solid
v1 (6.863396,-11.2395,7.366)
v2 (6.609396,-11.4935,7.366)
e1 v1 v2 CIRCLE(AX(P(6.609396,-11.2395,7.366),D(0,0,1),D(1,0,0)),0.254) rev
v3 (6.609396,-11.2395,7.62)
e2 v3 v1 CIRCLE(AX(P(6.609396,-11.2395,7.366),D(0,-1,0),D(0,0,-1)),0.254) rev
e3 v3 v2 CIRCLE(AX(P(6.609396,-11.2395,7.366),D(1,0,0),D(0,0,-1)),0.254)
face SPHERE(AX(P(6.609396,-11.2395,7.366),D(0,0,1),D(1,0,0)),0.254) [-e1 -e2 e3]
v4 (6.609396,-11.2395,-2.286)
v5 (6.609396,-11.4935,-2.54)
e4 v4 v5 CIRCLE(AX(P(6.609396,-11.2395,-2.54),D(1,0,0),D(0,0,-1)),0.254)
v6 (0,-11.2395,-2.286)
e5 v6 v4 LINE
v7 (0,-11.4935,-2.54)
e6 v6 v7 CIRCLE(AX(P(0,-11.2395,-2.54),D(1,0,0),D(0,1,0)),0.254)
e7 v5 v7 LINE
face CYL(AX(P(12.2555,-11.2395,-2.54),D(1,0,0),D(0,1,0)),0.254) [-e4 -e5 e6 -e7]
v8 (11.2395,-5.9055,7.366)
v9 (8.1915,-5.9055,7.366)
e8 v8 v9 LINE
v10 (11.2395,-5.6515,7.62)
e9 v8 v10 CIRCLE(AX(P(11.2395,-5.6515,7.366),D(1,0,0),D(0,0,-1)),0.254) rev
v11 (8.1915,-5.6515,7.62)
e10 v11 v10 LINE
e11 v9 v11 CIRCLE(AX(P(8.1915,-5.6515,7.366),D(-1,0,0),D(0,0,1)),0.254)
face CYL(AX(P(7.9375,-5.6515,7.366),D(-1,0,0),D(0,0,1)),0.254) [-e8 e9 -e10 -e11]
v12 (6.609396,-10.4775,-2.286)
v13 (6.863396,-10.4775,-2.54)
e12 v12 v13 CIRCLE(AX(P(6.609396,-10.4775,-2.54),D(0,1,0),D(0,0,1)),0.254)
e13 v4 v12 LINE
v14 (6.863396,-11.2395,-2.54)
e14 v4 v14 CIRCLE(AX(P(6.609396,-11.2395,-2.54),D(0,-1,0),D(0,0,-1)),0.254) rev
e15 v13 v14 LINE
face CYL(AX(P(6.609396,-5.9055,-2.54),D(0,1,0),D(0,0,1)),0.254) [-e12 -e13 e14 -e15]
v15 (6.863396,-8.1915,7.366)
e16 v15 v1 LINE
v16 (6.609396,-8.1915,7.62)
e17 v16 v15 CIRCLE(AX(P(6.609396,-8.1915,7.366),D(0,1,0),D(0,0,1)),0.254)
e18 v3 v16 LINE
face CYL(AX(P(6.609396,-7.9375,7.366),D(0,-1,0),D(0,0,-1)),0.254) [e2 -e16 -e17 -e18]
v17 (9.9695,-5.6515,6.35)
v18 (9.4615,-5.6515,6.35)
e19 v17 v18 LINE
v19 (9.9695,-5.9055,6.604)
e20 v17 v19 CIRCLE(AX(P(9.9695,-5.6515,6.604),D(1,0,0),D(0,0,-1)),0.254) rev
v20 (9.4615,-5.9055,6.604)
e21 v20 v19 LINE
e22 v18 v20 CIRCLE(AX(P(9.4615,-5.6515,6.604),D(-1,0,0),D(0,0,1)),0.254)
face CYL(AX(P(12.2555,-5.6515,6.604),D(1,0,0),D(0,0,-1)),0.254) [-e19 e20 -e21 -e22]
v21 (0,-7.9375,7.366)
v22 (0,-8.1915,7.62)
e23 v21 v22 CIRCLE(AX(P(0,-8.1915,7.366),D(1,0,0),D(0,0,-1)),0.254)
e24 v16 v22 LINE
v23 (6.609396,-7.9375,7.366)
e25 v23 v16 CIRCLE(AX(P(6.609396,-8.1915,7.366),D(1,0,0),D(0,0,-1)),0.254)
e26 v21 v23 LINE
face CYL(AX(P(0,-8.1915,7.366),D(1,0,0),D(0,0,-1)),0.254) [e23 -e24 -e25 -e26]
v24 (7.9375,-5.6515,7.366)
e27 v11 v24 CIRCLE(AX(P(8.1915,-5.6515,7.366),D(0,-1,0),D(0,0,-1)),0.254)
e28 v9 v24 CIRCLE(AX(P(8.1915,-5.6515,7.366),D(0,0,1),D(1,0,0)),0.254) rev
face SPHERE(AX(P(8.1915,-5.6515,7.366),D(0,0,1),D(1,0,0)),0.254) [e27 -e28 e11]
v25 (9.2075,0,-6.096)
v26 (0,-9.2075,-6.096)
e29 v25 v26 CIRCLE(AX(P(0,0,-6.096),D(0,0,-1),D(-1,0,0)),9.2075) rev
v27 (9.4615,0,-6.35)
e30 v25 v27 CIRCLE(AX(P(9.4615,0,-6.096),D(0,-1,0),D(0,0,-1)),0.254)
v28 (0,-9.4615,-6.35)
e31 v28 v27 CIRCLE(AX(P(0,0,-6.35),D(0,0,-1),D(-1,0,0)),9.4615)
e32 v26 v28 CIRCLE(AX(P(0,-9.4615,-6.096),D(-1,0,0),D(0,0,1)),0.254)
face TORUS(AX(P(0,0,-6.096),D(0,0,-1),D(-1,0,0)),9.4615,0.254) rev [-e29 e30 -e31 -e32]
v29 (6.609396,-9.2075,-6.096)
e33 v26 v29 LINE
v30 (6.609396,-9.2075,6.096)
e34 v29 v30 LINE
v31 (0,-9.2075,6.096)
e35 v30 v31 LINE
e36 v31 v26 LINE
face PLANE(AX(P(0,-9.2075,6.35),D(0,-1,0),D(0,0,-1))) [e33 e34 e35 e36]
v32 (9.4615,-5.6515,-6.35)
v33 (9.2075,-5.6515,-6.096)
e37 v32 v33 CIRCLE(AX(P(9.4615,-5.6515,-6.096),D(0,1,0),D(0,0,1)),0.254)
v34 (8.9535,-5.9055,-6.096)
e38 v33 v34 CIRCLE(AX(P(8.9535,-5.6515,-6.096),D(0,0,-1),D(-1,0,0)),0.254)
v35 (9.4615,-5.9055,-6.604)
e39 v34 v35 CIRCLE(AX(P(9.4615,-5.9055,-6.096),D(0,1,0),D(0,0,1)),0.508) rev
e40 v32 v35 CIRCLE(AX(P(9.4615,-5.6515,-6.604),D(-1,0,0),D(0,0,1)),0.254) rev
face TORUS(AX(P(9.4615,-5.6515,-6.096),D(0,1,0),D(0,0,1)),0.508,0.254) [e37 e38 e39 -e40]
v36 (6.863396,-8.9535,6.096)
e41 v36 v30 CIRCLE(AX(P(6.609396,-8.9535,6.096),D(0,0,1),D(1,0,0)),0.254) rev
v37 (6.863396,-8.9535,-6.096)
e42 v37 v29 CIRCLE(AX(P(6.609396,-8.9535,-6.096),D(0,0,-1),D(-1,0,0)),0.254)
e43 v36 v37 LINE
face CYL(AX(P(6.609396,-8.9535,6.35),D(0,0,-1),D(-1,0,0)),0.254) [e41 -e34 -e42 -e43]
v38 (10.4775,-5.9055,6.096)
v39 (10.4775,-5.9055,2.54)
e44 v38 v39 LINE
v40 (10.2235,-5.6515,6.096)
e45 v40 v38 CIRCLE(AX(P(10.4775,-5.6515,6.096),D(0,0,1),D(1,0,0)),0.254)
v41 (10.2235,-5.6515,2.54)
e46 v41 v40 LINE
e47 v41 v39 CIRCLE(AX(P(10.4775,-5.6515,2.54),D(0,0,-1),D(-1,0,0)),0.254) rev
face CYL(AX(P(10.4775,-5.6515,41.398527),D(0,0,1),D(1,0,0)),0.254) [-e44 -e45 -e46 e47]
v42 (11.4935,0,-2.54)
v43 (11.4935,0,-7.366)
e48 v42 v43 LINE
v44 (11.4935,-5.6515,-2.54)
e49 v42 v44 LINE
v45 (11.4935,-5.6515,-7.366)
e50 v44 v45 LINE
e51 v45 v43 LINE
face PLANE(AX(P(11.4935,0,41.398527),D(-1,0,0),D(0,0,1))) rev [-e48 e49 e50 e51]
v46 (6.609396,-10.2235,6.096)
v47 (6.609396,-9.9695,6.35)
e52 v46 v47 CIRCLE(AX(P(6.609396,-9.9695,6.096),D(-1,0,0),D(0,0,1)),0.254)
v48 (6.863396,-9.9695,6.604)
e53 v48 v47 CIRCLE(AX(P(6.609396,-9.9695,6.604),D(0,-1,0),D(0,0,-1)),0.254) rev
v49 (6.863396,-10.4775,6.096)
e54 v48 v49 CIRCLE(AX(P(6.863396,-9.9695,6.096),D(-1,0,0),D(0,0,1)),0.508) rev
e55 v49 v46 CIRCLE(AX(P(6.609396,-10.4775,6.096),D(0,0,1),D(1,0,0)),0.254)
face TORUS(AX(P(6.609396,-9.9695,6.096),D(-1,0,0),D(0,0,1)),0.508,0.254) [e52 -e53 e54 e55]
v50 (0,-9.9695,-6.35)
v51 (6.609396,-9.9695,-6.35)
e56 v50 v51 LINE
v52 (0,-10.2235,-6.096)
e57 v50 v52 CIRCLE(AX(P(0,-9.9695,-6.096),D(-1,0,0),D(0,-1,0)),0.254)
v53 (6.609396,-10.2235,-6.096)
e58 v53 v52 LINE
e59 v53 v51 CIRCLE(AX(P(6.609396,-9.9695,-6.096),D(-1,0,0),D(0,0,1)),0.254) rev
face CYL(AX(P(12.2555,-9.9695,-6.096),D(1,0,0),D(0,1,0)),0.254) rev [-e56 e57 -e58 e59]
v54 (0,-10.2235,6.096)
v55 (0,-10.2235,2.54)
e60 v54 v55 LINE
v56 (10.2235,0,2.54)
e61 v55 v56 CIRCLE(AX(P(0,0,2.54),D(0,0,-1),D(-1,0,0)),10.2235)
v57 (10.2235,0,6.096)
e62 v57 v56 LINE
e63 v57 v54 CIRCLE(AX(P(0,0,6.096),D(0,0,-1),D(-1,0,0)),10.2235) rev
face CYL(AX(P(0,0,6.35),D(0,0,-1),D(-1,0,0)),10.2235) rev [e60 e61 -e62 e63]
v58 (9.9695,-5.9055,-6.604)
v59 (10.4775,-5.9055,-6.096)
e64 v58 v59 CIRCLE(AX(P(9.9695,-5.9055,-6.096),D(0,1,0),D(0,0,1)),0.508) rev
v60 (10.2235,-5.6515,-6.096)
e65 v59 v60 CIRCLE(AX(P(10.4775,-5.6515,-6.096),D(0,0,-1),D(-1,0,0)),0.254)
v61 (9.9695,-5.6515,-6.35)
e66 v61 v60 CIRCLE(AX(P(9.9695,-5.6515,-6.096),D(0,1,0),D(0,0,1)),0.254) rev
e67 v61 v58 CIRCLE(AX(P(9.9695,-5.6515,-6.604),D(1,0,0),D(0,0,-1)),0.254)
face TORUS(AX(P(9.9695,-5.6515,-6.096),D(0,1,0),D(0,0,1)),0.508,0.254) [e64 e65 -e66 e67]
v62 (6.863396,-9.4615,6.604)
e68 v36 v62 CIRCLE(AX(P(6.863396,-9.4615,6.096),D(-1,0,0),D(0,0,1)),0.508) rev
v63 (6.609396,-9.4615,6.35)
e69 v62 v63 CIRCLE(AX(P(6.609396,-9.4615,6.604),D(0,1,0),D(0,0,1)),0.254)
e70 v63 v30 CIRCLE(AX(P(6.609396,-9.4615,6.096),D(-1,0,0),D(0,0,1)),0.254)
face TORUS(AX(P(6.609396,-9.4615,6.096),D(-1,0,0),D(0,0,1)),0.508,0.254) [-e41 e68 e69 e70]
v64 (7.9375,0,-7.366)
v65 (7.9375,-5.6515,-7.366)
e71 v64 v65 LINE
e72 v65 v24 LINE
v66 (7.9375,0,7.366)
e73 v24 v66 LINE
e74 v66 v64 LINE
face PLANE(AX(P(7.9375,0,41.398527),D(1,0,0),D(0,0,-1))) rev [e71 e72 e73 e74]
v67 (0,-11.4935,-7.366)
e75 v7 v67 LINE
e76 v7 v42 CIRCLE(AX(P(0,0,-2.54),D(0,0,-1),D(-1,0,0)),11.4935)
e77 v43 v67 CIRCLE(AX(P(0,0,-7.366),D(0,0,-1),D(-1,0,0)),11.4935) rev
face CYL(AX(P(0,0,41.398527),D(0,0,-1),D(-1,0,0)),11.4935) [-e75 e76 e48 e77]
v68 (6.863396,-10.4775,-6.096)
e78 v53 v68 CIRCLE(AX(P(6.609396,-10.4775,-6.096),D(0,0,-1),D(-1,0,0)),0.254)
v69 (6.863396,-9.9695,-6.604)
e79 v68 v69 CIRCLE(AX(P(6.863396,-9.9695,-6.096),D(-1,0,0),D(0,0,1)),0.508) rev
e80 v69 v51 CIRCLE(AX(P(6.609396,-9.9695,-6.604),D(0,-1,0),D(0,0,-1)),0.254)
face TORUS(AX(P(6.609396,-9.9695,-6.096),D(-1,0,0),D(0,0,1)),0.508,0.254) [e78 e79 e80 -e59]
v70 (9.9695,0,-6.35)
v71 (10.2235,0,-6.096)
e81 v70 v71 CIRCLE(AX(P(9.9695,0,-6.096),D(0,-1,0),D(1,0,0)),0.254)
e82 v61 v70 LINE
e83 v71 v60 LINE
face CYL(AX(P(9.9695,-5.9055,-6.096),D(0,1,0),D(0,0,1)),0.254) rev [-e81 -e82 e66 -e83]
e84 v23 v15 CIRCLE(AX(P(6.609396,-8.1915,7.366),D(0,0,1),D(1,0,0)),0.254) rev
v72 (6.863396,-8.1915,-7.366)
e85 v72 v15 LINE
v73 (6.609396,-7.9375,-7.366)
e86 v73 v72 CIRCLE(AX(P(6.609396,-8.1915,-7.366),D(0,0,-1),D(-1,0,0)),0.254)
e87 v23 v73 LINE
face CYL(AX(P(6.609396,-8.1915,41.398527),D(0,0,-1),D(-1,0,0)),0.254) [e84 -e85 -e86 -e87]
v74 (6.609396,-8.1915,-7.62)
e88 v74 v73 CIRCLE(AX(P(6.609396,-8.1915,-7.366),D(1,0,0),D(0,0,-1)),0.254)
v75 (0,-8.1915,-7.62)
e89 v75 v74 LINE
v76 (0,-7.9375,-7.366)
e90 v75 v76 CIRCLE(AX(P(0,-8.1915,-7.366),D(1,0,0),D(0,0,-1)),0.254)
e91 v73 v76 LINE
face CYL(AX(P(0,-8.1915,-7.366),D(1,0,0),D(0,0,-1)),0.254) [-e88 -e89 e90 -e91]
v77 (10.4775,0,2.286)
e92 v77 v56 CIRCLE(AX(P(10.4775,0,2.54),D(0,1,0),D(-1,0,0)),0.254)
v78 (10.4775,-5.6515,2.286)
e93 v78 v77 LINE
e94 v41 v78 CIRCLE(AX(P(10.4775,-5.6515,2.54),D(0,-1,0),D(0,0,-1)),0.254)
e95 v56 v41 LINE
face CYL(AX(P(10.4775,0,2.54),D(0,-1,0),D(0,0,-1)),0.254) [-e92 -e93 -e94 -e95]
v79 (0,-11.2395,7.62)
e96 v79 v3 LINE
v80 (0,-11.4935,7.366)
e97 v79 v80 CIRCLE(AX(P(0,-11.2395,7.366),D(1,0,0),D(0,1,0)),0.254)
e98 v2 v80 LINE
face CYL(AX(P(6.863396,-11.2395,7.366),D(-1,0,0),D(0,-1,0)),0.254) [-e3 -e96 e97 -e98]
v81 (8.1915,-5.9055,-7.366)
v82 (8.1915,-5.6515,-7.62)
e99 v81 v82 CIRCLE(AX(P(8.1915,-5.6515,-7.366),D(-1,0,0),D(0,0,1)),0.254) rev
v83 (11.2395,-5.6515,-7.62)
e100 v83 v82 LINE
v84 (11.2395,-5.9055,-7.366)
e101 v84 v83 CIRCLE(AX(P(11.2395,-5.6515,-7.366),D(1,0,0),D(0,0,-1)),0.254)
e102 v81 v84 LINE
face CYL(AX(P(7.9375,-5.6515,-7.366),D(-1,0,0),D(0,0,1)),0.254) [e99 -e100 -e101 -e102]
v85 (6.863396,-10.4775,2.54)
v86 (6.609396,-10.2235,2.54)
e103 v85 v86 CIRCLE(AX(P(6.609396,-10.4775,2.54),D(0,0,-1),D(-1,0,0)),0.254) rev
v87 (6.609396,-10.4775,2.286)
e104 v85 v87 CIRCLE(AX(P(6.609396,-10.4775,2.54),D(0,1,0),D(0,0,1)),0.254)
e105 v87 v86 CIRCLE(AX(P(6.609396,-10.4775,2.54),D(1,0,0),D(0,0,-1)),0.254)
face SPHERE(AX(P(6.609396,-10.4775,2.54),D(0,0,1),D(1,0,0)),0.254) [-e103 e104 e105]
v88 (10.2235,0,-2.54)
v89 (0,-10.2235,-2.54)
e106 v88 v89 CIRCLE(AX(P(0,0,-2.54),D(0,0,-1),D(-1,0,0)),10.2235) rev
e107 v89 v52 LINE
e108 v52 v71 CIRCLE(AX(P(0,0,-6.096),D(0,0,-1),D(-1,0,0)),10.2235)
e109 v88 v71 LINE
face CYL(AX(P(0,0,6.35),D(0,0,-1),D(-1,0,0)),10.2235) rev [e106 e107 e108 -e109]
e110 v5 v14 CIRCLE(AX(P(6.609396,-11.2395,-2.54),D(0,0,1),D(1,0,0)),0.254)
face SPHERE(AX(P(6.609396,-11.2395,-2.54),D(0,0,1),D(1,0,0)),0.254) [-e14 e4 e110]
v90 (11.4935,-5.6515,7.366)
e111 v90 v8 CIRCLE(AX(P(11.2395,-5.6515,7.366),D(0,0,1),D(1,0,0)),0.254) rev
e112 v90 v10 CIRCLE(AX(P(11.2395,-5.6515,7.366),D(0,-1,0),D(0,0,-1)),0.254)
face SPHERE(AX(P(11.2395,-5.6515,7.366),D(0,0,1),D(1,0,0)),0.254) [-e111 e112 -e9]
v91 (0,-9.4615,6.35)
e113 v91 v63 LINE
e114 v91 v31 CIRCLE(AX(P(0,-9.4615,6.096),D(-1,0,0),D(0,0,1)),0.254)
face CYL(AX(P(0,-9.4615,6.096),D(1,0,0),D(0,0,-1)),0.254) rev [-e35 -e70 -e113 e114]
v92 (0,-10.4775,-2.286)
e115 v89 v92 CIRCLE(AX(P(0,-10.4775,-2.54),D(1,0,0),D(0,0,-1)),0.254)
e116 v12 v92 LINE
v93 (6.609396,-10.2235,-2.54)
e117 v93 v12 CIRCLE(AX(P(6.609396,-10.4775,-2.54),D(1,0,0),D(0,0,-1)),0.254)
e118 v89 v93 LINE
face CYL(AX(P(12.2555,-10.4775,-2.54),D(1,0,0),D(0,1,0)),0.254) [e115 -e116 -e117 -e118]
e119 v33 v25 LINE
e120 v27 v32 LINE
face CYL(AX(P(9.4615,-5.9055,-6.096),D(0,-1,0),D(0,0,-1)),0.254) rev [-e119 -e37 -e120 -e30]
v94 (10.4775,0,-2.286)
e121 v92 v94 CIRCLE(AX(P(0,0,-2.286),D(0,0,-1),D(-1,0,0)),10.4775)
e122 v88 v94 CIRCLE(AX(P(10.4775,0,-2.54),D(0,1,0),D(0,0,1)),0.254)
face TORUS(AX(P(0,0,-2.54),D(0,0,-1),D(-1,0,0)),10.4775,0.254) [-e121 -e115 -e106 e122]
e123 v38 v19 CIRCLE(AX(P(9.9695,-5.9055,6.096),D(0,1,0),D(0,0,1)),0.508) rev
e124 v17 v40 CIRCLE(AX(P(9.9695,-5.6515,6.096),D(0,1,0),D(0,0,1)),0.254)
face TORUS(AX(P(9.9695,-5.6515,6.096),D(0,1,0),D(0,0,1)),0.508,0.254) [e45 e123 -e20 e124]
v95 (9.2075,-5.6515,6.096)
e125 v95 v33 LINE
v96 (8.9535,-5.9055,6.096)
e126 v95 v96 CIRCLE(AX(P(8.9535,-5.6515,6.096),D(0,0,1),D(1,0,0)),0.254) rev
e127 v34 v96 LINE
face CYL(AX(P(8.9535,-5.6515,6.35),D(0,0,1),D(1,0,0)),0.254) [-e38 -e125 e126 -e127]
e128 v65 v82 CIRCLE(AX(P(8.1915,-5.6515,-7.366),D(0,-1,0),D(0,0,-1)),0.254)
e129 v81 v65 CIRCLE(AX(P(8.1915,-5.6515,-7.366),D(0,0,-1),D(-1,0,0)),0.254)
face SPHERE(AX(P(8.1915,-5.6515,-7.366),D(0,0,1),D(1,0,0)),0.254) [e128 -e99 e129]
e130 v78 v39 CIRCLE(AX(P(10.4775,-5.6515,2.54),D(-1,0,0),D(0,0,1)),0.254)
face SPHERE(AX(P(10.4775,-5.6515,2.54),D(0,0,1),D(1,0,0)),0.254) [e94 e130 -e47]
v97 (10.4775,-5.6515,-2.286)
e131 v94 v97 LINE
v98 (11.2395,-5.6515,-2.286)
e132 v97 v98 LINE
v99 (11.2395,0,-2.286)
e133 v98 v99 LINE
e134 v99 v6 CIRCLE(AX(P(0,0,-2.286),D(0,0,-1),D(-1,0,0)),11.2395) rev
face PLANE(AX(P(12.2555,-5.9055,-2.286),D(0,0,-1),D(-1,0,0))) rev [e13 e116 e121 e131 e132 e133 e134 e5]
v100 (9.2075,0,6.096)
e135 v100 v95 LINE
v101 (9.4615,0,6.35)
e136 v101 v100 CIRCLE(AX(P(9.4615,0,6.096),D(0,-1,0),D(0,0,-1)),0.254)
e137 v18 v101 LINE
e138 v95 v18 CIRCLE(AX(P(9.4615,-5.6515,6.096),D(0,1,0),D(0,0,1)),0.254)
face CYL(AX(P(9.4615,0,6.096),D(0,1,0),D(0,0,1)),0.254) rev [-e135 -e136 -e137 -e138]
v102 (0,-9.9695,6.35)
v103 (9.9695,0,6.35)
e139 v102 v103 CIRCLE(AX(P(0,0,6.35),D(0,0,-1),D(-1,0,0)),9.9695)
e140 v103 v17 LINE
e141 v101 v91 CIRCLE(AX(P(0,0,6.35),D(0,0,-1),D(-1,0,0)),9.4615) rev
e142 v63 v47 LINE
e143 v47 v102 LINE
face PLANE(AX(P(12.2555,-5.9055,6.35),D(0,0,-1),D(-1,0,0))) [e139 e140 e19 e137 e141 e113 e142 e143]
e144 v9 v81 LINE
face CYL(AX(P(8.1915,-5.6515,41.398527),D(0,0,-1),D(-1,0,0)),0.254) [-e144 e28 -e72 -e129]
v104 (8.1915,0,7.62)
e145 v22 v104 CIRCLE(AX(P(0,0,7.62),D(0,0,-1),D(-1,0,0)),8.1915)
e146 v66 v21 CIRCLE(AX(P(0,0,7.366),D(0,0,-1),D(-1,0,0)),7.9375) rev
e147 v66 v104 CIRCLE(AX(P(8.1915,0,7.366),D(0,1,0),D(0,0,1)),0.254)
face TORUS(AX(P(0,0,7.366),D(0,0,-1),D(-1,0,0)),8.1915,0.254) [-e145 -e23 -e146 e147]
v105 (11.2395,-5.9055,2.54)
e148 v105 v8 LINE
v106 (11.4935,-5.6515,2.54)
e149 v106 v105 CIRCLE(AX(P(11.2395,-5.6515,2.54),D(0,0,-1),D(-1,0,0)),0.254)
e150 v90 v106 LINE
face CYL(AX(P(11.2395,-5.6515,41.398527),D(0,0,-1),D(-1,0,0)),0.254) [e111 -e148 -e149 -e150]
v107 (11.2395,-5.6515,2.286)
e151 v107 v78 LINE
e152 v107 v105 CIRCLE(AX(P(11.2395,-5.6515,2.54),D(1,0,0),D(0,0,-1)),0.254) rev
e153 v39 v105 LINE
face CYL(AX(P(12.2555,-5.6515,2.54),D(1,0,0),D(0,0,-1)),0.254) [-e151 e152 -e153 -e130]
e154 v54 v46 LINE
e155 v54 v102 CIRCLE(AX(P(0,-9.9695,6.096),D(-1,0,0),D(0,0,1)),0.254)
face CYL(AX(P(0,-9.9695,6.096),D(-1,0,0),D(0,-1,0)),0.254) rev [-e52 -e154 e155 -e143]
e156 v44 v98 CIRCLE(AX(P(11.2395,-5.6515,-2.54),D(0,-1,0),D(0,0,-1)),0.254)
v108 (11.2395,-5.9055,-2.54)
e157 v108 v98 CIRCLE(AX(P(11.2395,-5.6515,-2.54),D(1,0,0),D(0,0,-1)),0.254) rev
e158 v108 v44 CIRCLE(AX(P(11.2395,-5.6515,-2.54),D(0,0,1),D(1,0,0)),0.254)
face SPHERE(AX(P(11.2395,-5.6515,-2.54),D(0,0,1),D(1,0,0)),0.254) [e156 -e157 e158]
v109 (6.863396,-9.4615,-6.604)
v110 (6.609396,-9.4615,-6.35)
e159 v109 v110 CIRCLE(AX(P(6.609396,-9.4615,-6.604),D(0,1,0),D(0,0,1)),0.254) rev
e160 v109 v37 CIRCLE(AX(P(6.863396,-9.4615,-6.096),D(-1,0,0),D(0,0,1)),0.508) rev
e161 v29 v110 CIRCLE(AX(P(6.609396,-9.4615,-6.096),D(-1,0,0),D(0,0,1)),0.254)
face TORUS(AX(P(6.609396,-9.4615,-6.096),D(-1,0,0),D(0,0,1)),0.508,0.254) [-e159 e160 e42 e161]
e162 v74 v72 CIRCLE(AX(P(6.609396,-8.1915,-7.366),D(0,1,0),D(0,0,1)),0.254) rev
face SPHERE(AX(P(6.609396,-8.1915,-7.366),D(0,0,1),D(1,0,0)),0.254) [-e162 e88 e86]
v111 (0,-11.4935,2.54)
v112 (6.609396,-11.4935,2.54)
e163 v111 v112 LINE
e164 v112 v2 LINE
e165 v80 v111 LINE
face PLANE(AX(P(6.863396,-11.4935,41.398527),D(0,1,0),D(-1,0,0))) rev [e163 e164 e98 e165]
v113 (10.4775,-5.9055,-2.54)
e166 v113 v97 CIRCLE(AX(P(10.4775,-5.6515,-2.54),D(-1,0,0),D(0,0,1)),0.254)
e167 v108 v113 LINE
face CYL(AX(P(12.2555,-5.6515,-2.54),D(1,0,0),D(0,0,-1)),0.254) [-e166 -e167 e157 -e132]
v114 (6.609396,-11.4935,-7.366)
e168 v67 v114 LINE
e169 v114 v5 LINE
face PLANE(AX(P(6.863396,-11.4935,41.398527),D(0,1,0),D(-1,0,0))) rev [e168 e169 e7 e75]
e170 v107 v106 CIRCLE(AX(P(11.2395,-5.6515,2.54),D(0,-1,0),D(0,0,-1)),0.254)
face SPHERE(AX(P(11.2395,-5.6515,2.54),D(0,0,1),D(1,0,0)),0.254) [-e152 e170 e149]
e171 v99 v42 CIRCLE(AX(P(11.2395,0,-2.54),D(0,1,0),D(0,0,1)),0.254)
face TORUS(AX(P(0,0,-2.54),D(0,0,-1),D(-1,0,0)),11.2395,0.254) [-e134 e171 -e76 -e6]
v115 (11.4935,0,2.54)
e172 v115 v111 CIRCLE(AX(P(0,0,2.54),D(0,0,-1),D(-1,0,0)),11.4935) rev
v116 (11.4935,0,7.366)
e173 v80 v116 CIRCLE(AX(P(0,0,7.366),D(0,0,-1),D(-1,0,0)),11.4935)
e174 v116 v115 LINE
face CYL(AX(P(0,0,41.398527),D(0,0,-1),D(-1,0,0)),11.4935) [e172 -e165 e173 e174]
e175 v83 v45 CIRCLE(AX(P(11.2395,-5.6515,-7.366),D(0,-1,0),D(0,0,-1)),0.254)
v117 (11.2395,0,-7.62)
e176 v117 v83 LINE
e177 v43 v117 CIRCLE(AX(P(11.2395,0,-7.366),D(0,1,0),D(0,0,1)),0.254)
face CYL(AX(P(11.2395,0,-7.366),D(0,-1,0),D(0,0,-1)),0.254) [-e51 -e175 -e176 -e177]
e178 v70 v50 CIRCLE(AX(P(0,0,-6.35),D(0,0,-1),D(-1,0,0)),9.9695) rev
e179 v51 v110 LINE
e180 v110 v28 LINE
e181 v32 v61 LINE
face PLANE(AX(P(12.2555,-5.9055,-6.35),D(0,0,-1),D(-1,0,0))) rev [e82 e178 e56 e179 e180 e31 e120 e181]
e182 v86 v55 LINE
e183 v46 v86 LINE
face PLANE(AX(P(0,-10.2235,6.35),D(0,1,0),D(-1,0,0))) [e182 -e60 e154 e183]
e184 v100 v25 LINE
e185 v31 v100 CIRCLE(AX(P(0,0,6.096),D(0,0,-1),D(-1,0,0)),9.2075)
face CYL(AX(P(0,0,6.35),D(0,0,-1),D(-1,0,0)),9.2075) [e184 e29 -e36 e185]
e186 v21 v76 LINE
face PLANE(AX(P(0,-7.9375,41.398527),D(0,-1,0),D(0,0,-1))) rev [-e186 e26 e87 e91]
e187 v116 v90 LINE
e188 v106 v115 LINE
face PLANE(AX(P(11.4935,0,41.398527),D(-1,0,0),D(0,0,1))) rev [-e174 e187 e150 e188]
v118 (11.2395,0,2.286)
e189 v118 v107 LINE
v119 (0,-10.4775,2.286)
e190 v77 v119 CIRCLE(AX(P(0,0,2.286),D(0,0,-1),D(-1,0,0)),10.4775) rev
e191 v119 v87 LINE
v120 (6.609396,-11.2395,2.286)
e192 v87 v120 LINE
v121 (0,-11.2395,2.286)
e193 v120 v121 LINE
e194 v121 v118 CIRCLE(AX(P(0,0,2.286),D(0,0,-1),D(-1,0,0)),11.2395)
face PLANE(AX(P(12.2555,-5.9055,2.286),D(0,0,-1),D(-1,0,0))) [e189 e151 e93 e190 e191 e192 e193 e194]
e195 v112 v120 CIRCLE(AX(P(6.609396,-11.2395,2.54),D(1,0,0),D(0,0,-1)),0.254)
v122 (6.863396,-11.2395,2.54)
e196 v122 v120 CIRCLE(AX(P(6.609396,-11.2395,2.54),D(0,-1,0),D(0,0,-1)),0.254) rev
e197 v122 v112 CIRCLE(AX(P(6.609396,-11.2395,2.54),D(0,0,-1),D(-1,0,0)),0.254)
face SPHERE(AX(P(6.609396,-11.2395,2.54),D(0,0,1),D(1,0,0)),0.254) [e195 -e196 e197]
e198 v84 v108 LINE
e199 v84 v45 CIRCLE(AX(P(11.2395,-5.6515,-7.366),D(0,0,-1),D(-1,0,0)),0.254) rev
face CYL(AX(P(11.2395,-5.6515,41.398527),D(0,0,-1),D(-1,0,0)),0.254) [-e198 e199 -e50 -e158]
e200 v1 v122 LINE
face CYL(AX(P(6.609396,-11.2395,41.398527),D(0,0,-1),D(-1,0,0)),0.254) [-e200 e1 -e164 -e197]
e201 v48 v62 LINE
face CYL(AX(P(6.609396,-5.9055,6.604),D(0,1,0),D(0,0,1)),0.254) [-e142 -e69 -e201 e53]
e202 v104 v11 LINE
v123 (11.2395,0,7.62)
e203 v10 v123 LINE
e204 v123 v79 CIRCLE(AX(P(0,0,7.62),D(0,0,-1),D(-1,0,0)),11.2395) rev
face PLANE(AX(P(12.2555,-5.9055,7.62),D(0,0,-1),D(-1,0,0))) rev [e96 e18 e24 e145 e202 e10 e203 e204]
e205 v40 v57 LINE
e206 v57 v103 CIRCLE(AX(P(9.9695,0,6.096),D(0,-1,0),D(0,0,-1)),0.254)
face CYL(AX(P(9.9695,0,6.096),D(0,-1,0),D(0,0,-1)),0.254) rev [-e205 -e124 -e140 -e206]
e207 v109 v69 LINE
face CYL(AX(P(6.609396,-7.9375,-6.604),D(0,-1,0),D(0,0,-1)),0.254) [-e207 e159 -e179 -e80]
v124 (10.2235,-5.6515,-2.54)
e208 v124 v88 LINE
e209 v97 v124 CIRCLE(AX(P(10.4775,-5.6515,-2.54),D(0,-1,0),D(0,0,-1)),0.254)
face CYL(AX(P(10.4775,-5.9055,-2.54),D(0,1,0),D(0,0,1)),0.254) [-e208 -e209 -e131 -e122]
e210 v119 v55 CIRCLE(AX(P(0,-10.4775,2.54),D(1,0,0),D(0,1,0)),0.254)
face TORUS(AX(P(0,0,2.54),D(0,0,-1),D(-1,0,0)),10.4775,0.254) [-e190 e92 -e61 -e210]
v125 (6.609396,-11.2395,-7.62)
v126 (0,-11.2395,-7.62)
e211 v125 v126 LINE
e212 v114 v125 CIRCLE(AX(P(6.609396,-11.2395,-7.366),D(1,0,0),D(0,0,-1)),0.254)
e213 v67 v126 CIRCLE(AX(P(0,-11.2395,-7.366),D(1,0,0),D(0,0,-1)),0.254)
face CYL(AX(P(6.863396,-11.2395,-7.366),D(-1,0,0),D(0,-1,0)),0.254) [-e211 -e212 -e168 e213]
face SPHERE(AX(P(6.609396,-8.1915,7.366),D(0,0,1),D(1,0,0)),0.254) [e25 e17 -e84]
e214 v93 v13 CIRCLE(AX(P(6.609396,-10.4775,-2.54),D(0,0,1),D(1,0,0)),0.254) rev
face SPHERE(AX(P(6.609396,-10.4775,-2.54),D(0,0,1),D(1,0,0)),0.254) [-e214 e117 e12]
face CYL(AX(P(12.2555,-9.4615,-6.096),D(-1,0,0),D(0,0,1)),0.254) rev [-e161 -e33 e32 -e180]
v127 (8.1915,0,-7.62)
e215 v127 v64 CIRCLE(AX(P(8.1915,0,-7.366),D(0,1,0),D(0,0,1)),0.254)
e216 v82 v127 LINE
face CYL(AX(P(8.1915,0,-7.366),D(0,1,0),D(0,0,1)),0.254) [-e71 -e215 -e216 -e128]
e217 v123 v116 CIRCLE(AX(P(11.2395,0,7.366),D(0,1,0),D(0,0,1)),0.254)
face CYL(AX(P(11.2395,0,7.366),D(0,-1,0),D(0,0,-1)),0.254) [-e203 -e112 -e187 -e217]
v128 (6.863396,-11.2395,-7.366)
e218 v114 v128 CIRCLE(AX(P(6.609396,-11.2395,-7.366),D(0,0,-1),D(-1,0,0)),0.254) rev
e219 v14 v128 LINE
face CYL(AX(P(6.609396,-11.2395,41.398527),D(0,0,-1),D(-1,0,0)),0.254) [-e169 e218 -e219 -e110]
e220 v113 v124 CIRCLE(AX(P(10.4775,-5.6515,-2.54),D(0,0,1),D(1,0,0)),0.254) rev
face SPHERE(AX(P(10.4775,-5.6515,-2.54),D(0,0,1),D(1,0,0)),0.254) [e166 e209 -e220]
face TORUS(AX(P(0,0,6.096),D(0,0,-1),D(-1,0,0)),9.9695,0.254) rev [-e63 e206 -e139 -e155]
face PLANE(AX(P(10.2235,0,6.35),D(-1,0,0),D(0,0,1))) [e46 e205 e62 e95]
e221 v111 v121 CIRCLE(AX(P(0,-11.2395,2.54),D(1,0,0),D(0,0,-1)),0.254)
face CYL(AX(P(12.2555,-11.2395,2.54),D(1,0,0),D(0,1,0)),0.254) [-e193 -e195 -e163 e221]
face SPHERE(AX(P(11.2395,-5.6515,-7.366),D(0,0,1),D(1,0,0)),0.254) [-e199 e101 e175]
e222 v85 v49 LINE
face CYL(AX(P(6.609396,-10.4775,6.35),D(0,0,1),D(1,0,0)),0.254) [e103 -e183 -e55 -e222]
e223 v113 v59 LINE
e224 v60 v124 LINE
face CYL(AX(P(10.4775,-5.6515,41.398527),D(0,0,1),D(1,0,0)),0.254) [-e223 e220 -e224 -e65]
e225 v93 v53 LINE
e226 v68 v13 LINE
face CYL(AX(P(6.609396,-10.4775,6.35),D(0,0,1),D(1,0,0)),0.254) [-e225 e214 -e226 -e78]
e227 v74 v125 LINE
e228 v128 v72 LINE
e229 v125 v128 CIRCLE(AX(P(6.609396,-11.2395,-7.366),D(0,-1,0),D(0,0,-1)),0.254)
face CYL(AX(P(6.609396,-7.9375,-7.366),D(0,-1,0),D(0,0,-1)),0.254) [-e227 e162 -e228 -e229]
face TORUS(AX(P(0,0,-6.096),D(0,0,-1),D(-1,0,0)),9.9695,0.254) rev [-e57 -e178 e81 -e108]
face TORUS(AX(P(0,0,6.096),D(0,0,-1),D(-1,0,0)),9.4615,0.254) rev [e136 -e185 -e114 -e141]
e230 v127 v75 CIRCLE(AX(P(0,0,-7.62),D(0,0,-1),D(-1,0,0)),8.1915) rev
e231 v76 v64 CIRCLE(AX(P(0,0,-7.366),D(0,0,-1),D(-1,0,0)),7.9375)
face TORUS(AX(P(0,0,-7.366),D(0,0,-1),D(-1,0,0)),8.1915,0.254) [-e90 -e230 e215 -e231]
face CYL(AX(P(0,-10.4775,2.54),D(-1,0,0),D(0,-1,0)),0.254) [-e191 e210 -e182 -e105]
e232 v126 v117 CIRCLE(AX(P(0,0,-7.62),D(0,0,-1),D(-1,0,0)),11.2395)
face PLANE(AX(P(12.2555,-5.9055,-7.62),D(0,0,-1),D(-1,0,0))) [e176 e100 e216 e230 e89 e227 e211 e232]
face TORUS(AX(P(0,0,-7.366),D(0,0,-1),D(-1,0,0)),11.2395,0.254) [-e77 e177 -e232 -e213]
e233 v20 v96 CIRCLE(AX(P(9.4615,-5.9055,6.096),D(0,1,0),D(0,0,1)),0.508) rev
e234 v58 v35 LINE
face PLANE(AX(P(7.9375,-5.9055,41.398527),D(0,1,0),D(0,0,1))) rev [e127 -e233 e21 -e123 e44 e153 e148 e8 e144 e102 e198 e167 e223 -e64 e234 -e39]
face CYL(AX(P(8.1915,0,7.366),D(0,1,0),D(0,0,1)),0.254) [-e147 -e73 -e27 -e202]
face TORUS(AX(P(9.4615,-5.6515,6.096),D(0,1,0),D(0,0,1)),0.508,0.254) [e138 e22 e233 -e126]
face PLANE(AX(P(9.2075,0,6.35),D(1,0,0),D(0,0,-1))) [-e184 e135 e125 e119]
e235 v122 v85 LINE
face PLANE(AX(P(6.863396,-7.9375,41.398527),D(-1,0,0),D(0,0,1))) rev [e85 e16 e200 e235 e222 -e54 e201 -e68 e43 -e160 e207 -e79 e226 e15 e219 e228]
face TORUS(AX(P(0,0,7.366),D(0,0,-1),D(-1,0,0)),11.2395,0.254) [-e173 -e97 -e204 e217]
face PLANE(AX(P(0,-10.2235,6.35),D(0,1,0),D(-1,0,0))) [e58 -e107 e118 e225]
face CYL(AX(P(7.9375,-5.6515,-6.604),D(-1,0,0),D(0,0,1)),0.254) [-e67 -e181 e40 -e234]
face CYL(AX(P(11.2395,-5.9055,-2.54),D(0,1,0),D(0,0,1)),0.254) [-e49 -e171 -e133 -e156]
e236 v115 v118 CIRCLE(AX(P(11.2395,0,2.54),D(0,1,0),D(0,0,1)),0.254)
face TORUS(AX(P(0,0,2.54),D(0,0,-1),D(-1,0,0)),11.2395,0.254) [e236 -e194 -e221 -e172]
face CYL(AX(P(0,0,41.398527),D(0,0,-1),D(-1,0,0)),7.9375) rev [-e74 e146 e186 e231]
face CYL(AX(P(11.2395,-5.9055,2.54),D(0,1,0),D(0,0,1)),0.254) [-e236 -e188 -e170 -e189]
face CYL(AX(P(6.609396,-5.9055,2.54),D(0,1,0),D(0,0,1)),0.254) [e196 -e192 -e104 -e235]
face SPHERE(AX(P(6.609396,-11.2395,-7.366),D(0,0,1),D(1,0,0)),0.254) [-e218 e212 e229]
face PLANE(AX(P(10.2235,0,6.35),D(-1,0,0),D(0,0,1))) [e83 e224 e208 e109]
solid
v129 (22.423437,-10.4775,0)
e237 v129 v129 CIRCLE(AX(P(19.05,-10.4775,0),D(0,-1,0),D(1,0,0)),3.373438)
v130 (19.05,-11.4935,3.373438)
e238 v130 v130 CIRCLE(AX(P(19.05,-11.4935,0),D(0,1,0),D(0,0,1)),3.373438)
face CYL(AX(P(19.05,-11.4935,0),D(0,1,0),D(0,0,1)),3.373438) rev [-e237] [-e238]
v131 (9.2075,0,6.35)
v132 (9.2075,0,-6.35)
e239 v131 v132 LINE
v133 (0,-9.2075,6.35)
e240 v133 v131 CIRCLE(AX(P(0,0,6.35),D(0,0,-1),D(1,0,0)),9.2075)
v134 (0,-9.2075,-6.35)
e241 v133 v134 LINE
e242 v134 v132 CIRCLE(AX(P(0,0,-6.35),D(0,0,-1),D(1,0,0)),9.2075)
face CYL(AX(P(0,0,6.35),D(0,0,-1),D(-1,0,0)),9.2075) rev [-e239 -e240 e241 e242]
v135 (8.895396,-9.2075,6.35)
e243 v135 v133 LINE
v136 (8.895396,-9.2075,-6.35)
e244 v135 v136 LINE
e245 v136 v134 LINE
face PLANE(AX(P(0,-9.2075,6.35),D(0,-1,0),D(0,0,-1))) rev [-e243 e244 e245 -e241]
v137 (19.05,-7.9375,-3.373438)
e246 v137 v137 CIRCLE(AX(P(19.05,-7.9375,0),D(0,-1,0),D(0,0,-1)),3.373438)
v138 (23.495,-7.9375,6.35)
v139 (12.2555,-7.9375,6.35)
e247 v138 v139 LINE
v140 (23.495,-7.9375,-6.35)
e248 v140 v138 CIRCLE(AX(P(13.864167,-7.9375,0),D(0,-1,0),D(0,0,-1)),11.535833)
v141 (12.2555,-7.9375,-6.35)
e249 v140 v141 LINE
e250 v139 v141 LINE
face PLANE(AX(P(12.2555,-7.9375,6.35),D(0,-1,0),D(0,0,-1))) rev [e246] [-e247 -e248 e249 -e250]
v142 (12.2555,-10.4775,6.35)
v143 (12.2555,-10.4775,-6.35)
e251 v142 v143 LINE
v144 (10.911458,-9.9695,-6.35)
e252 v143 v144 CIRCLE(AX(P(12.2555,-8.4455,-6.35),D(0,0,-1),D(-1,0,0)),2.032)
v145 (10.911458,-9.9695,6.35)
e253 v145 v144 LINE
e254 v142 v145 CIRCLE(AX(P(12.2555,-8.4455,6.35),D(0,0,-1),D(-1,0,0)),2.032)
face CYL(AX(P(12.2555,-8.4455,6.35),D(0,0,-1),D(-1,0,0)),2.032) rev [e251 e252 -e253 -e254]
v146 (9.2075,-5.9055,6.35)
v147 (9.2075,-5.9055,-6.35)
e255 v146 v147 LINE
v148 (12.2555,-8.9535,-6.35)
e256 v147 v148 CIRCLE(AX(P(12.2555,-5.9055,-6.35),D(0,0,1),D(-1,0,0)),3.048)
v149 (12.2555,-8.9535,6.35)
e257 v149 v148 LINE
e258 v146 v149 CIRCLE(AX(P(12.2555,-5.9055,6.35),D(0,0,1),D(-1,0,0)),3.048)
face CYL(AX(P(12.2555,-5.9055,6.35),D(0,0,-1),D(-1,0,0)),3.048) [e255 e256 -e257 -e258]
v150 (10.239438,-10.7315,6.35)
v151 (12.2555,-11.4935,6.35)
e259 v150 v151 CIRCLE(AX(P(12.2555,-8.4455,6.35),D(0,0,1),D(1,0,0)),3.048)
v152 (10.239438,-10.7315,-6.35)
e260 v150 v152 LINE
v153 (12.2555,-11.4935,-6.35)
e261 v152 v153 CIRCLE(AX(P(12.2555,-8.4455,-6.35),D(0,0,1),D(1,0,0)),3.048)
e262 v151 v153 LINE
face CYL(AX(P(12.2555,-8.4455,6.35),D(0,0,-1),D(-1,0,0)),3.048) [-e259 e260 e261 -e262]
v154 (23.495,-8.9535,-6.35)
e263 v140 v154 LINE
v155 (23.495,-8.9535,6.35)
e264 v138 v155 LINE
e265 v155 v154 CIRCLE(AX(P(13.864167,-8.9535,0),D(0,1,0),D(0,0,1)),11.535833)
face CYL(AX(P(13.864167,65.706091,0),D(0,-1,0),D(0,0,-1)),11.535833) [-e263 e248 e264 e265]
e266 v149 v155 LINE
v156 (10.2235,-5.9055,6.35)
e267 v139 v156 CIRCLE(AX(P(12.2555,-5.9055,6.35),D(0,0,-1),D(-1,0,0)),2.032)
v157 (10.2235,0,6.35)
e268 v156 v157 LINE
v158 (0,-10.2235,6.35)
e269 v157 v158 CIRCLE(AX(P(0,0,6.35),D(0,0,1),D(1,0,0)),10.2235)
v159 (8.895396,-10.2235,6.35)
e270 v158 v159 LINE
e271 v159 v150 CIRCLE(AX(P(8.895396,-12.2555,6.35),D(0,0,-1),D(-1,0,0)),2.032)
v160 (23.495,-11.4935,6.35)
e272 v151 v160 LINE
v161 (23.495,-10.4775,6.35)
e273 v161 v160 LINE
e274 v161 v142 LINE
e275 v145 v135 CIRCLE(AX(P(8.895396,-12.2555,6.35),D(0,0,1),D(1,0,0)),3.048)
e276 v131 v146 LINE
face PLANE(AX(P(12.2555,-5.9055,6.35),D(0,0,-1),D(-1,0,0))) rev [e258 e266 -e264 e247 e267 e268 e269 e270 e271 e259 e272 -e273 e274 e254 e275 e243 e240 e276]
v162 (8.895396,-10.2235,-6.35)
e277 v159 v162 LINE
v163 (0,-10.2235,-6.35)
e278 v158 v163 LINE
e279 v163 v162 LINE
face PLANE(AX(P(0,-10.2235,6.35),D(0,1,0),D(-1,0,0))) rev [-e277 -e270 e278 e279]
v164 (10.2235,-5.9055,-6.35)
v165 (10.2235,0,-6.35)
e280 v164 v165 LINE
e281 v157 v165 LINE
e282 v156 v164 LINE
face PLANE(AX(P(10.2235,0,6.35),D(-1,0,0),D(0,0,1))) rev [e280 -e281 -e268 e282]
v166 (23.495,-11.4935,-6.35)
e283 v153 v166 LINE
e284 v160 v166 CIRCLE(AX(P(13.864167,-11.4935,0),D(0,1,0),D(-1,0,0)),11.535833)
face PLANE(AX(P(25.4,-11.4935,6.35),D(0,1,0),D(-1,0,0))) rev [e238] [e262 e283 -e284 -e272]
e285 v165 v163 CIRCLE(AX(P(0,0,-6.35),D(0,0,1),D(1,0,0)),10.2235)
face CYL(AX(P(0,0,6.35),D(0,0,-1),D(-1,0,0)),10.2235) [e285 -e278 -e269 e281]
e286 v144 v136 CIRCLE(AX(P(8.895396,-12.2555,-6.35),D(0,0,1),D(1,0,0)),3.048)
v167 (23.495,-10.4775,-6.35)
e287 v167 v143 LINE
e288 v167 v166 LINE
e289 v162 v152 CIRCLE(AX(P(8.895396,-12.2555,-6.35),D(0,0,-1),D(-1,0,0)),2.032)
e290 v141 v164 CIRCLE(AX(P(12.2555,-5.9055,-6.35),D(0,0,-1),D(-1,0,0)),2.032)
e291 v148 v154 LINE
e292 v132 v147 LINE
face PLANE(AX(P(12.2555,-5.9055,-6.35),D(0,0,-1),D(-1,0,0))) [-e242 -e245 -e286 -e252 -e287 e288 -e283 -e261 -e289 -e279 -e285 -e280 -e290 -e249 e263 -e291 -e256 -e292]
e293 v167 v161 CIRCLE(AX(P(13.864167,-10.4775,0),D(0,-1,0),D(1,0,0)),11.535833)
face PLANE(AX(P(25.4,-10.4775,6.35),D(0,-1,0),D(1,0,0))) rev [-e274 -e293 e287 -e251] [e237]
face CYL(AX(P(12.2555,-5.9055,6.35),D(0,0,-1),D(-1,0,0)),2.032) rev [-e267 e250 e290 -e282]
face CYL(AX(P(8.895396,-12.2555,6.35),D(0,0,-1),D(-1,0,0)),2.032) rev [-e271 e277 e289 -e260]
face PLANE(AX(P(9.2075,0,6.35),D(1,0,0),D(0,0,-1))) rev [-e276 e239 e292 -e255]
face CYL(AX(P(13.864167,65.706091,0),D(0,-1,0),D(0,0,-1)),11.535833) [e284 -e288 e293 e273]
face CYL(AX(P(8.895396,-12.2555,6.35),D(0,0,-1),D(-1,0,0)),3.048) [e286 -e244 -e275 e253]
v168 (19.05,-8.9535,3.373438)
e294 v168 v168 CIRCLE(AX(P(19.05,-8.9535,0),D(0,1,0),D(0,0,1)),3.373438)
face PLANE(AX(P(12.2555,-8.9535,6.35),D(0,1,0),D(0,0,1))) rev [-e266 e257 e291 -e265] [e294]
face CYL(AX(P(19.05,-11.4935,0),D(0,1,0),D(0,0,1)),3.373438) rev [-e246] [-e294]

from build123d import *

# Parameters (mm, degrees)
BOSS_EXTRUDE1_DEPTH         = 6.35
SKETCH2_R                   = 3.3734375
CUT_EXTRUDE1_DEPTH          = 29.59340907
CUT_EXTRUDE3_DEPTH          = 29.59340907
CUT_EXTRUDE3_DEPTH_BACK     = 29.59340907
BOSS_EXTRUDE2_DEPTH         = 7.62
BOSS_EXTRUDE2_DEPTH_BACK    = 7.62
BODY_MOVE_COPY1_START       = -5.9055
BODY_MOVE_COPY1_OUTLINE_W   = 1.016
BODY_MOVE_COPY1_OUTLINE_H   = 12.7
BODY_MOVE_COPY1_DEPTH       = 5.9055
BODY_MOVE_COPY1_START_2     = -10.2235
BODY_MOVE_COPY1_2_OUTLINE_W = 1.016
BODY_MOVE_COPY1_2_OUTLINE_H = 12.7
BODY_MOVE_COPY1_2_DEPTH     = 0.254
BODY_MOVE_COPY1_START_3     = -8.9535
BODY_MOVE_COPY1_3_OUTLINE_R = 3.3734375
BODY_MOVE_COPY1_3_DEPTH     = 3.048
BODY_MOVE_COPY1_START_4     = -11.4935
BODY_MOVE_COPY1_4_OUTLINE_R = 3.3734375
BODY_MOVE_COPY1_4_DEPTH     = 2.286
BODY_MOVE_COPY1_5_OUTLINE_W = 1.016
BODY_MOVE_COPY1_5_OUTLINE_H = 12.7
BODY_MOVE_COPY1_5_DEPTH     = 9.2075
BODY_MOVE_COPY1_START_5     = -10.7315
BODY_MOVE_COPY1_6_OUTLINE_W = 1.016
BODY_MOVE_COPY1_6_OUTLINE_H = 12.7
BODY_MOVE_COPY1_6_DEPTH     = 1.524
BODY_MOVE_COPY1_START_6     = -6.35
BODY_MOVE_COPY1_7_DEPTH     = 12.7
BODY_MOVE_COPY1_8_DEPTH     = 12.7
CUT_EXTRUDE4_DEPTH          = 2.286
CUT_EXTRUDE4_DEPTH_BACK     = 2.286
FILLET1_R                   = 0.254


with BuildPart() as part:
    # Sketch1 → Boss-Extrude1 (new, symmetric)
    with BuildSketch(Plane.XY):
        with BuildLine():
            Line((0, -9.2075), (8.895395835, -9.2075))
            ThreePointArc((8.895395835, -9.2075), (9.973026569, -9.404357071), (10.911458334, -9.9695))
            ThreePointArc((10.911458334, -9.9695), (11.53707951, -10.346261952), (12.2555, -10.4775))
            Line((12.2555, -10.4775), (25.4, -10.4775))
            Line((25.4, -10.4775), (25.4, -11.4935))
            Line((25.4, -11.4935), (12.2555, -11.4935))
            ThreePointArc((12.2555, -11.4935), (11.177869265, -11.296642929), (10.239437501, -10.7315))
            ThreePointArc((10.239437501, -10.7315), (9.613816325, -10.354738048), (8.895395835, -10.2235))
            Line((8.895395835, -10.2235), (0, -10.2235))
            ThreePointArc((0, -10.2235), (-7.229106177, 7.229106177), (10.2235, 0))
            Line((10.2235, 0), (10.2235, -5.9055))
            ThreePointArc((10.2235, -5.9055), (10.818659021, -7.342340979), (12.2555, -7.9375))
            Line((12.2555, -7.9375), (25.4, -7.9375))
            Line((25.4, -7.9375), (25.4, -8.9535))
            Line((25.4, -8.9535), (12.2555, -8.9535))
            ThreePointArc((12.2555, -8.9535), (10.100238531, -8.060761469), (9.2075, -5.9055))
            Line((9.2075, -5.9055), (9.2075, 0))
            ThreePointArc((9.2075, 0), (-6.510685688, 6.510685688), (0, -9.2075))
        make_face()
    extrude(amount=BOSS_EXTRUDE1_DEPTH, both=True)

    # Sketch2 → Cut-Extrude1 (cut, through all)
    with BuildSketch(Plane(origin=(0, 0, 0), x_dir=(1, 0, 0), z_dir=(0, 1, 0))):
        with Locations(Location((19.05, 0, 0), (0, 0, 270))):
            Circle(SKETCH2_R)
    extrude(amount=-CUT_EXTRUDE1_DEPTH, mode=Mode.SUBTRACT)

    # Sketch4 → Cut-Extrude3 (cut, two sides: drawn at the far end of the back side and taken through both)
    with BuildSketch(Plane(origin=(0, 0, 0), x_dir=(1, 0, 0), z_dir=(0, 1, 0)).offset(-CUT_EXTRUDE3_DEPTH_BACK)):
        with BuildLine():
            Line((-21.676655752, 74.860344557), (23.495, 6.35))
            ThreePointArc((23.495, 6.35), (25.4, 0), (23.495, -6.35))
            Line((23.495, -6.35), (-21.676655752, -74.860344557))
            Line((-21.676655752, -74.860344557), (142.447026813, -74.860344557))
            Line((142.447026813, -74.860344557), (142.447026813, 74.860344557))
            Line((142.447026813, 74.860344557), (-21.676655752, 74.860344557))
        make_face()
    extrude(amount=CUT_EXTRUDE3_DEPTH + CUT_EXTRUDE3_DEPTH_BACK, mode=Mode.SUBTRACT)


with BuildPart() as body_2:
    # Sketch5 → Boss-Extrude2 (new, two sides: drawn at the far end of the back side and taken through both)
    with BuildSketch(Plane.XY.offset(-BOSS_EXTRUDE2_DEPTH_BACK)):
        with BuildLine():
            Line((7.9375, 0), (7.9375, -5.9055))
            Line((7.9375, -5.9055), (11.4935, -5.9055))
            Line((11.4935, -5.9055), (11.4935, 0))
            ThreePointArc((11.4935, 0), (-8.12713179, 8.12713179), (0, -11.4935))
            Line((0, -11.4935), (6.863395835, -11.4935))
            Line((6.863395835, -11.4935), (6.863395835, -7.9375))
            Line((6.863395835, -7.9375), (0, -7.9375))
            ThreePointArc((0, -7.9375), (-5.612660076, 5.612660076), (7.9375, 0))
        make_face()
    extrude(amount=BOSS_EXTRUDE2_DEPTH + BOSS_EXTRUDE2_DEPTH_BACK)


with BuildPart() as body_3:
    # Body-Move/Copy1: read off the stored shape, not the designer's step
    # Body-Move/Copy1 outline → Body-Move/Copy1 (new body)
    with BuildSketch(Plane(origin=(0, 0, 0), x_dir=(1, 0, 0), z_dir=(0, 1, 0)).offset(BODY_MOVE_COPY1_START)):
        with Locations((9.7155, 0)):
            Rectangle(BODY_MOVE_COPY1_OUTLINE_W, BODY_MOVE_COPY1_OUTLINE_H)
    extrude(amount=BODY_MOVE_COPY1_DEPTH)

    # Body-Move_Copy1 2 outline → Body-Move_Copy1 2 (add)
    with BuildSketch(Plane(origin=(0, 0, 0), x_dir=(1, 0, 0), z_dir=(0, 1, 0)).offset(BODY_MOVE_COPY1_START_2)):
        with Locations((9.7155, 0)):
            Rectangle(BODY_MOVE_COPY1_2_OUTLINE_W, BODY_MOVE_COPY1_2_OUTLINE_H)
    extrude(amount=BODY_MOVE_COPY1_2_DEPTH)

    # Body-Move_Copy1 3 outline → Body-Move_Copy1 3 (add)
    with BuildSketch(Plane(origin=(0, 0, 0), x_dir=(1, 0, 0), z_dir=(0, 1, 0)).offset(BODY_MOVE_COPY1_START_3)):
        with BuildLine():
            ThreePointArc((23.495, -6.35), (25.4, 0), (23.495, 6.35))
            Line((23.495, 6.35), (9.2075, 6.35))
            Line((9.2075, 6.35), (9.2075, -6.35))
            Line((9.2075, -6.35), (23.495, -6.35))
        make_face()
        with Locations((19.05, 0)):
            Circle(BODY_MOVE_COPY1_3_OUTLINE_R, mode=Mode.SUBTRACT)
    extrude(amount=BODY_MOVE_COPY1_3_DEPTH)

    # Body-Move_Copy1 4 outline → Body-Move_Copy1 4 (add)
    with BuildSketch(Plane(origin=(0, 0, 0), x_dir=(1, 0, 0), z_dir=(0, 1, 0)).offset(BODY_MOVE_COPY1_START_4)):
        with BuildLine():
            Line((10.2235, -6.35), (23.495, -6.35))
            ThreePointArc((23.495, -6.35), (25.4, 0), (23.495, 6.35))
            Line((23.495, 6.35), (10.2235, 6.35))
            Line((10.2235, 6.35), (10.2235, -6.35))
        make_face()
        with Locations((19.05, 0)):
            Circle(BODY_MOVE_COPY1_4_OUTLINE_R, mode=Mode.SUBTRACT)
    extrude(amount=BODY_MOVE_COPY1_4_DEPTH)

    # Body-Move_Copy1 5 outline → Body-Move_Copy1 5 (add)
    with BuildSketch(Plane(origin=(0, 0, 0), x_dir=(1, 0, 0), z_dir=(0, 1, 0))):
        with Locations((9.7155, 0)):
            Rectangle(BODY_MOVE_COPY1_5_OUTLINE_W, BODY_MOVE_COPY1_5_OUTLINE_H)
    extrude(amount=BODY_MOVE_COPY1_5_DEPTH)

    # Body-Move_Copy1 6 outline → Body-Move_Copy1 6 (add)
    with BuildSketch(Plane(origin=(0, 0, 0), x_dir=(1, 0, 0), z_dir=(0, 1, 0)).offset(BODY_MOVE_COPY1_START_5)):
        with Locations((9.7155, 0)):
            Rectangle(BODY_MOVE_COPY1_6_OUTLINE_W, BODY_MOVE_COPY1_6_OUTLINE_H)
    extrude(amount=BODY_MOVE_COPY1_6_DEPTH)

    # Body-Move_Copy1 7 outline → Body-Move_Copy1 7 (cut)
    with BuildSketch(Plane.XY.offset(BODY_MOVE_COPY1_START_6)):
        with BuildLine():
            ThreePointArc((10.2235, -5.9055), (10.818659021, -7.342340979), (12.2555, -7.9375))
            Line((12.2555, -7.9375), (27, -7.9375))
            Line((27, -7.9375), (27, -5.9055))
            Line((27, -5.9055), (10.2235, -5.9055))
        make_face()
        with BuildLine():
            ThreePointArc((9.2075, 4.443185344), (9.966263806, 2.278933523), (10.2235, 0))
            Line((10.2235, 0), (10.2235, 9.2075))
            Line((10.2235, 9.2075), (9.2075, 9.2075))
            Line((9.2075, 9.2075), (9.2075, 4.443185344))
        make_face()
        with BuildLine():
            Line((9.2075, -8.9535), (12.2555, -8.9535))
            ThreePointArc((12.2555, -8.9535), (10.100238531, -8.060761469), (9.2075, -5.9055))
            Line((9.2075, -5.9055), (9.2075, -8.9535))
        make_face()
        with BuildLine():
            Line((27, -10.4775), (27, -9.2075))
            Line((27, -9.2075), (9.2075, -9.2075))
            Line((9.2075, -9.2075), (9.2075, -9.223521275))
            ThreePointArc((9.2075, -9.223521275), (10.1177751, -9.463351556), (10.911458334, -9.9695))
            ThreePointArc((10.911458334, -9.9695), (11.53707951, -10.346261952), (12.2555, -10.4775))
            Line((12.2555, -10.4775), (27, -10.4775))
        make_face()
        with BuildLine():
            Line((9.2075, -10.247611809), (9.2075, -10.7315))
            Line((9.2075, -10.7315), (10.2235, -10.7315))
            Line((10.2235, -10.7315), (10.2235, -11.4935))
            Line((10.2235, -11.4935), (12.2555, -11.4935))
            ThreePointArc((12.2555, -11.4935), (11.177869265, -11.296642929), (10.239437501, -10.7315))
            ThreePointArc((10.239437501, -10.7315), (9.758090276, -10.415722215), (9.2075, -10.247611809))
        make_face()
    extrude(amount=BODY_MOVE_COPY1_7_DEPTH, mode=Mode.SUBTRACT)

    # Body-Move_Copy1 8 outline → Body-Move_Copy1 8 (add)
    with BuildSketch(Plane.XY.offset(BODY_MOVE_COPY1_START_6)):
        with BuildLine():
            Line((9.2075, 0), (9.2075, 4.443185344))
            ThreePointArc((9.2075, 4.443185344), (-8.658662068, 5.435763372), (0, -10.2235))
            Line((0, -10.2235), (8.895395835, -10.2235))
            ThreePointArc((8.895395835, -10.2235), (9.051912918, -10.22953692), (9.2075, -10.247611809))
            Line((9.2075, -10.247611809), (9.2075, -9.223521275))
            ThreePointArc((9.2075, -9.223521275), (9.051653388, -9.211507954), (8.895395835, -9.2075))
            Line((8.895395835, -9.2075), (0, -9.2075))
            ThreePointArc((0, -9.2075), (-6.510685688, 6.510685688), (9.2075, 0))
        make_face()
    extrude(amount=BODY_MOVE_COPY1_8_DEPTH)


with BuildPart() as body_2_1:
    add(body_2.part)

    # Combine1: cut body 3
    add(body_3.part, mode=Mode.SUBTRACT)

    # Sketch7 → Cut-Extrude4 (cut, two sides: drawn at the far end of the back side and taken through both)
    with BuildSketch(Plane.XY.offset(-CUT_EXTRUDE4_DEPTH_BACK)):
        with BuildLine():
            Line((9.2075, 0), (9.2075, -5.9055))
            Line((9.2075, -5.9055), (11.4935, -5.9055))
            Line((11.4935, -5.9055), (11.4935, 0))
            ThreePointArc((11.4935, 0), (-8.12713179, 8.12713179), (0, -11.4935))
            Line((0, -11.4935), (6.863395835, -11.4935))
            Line((6.863395835, -11.4935), (6.863395835, -9.2075))
            Line((6.863395835, -9.2075), (0, -9.2075))
            ThreePointArc((0, -9.2075), (-6.510685688, 6.510685688), (9.2075, 0))
        make_face()
    extrude(amount=CUT_EXTRUDE4_DEPTH + CUT_EXTRUDE4_DEPTH_BACK, mode=Mode.SUBTRACT)

    # Fillet1
    fillet1_edges = [body_2_1.edges().sort_by_distance(p)[0] for p in [
        (10.2235, -5.9055, -4.318),
        (6.863395835, -10.2235, -4.318),
        (11.4935, -5.9055, -4.953),
        (6.863395835, -11.4935, -4.953),
        (3.431697917, -10.2235, -2.286),
        (-8.658662068, 5.435763372, -2.286),
        (10.2235, -2.95275, -2.286),
        (6.863395835, -10.8585, -2.286),
        (6.863395835, -10.8585, 2.286),
        (3.431697917, -11.4935, 2.286),
        (3.431697917, -11.4935, -2.286),
        (-8.12713179, 8.12713179, 2.286),
        (-8.12713179, 8.12713179, -2.286),
        (11.4935, -2.95275, 2.286),
        (11.4935, -2.95275, -2.286),
        (10.8585, -5.9055, 2.286),
        (10.8585, -5.9055, -2.286),
        (3.431697917, -10.2235, 2.286),
        (-8.658662068, 5.435763372, 2.286),
        (10.2235, -2.95275, 2.286),
        (6.863395835, -7.9375, 0),
        (3.431697917, -7.9375, 7.62),
        (6.863395835, -11.4935, 4.953),
        (11.4935, -5.9055, 4.953),
        (7.9375, -5.9055, 0),
        (6.863395835, -9.7155, 7.62),
        (3.431697917, -11.4935, 7.62),
        (-8.12713179, 8.12713179, 7.62),
        (11.4935, -2.95275, 7.62),
        (9.7155, -5.9055, 7.62),
        (7.9375, -2.95275, 7.62),
        (-5.612660076, 5.612660076, 7.62),
        (7.9375, -2.95275, -7.62),
        (9.7155, -5.9055, -7.62),
        (11.4935, -2.95275, -7.62),
        (-8.12713179, 8.12713179, -7.62),
        (3.431697917, -11.4935, -7.62),
        (6.863395835, -9.7155, -7.62),
        (3.431697917, -7.9375, -7.62),
        (-5.612660076, 5.612660076, -7.62),
        (9.7155, -5.9055, -6.35),
        (9.7155, -5.9055, 6.35),
        (6.863395835, -9.2075, 0),
        (6.863395835, -10.2235, 4.318),
        (3.431697917, -10.2235, -6.35),
        (3.431697917, -9.2075, -6.35),
        (3.431697917, -9.2075, 6.35),
        (-6.510685688, 6.510685688, 6.35),
        (9.2075, -2.95275, 6.35),
        (10.2235, -2.95275, 6.35),
        (-8.658662068, 5.435763372, 6.35),
        (3.431697917, -10.2235, 6.35),
        (6.863395835, -9.7155, 6.35),
        (6.863395835, -9.7155, -6.35),
        (9.2075, -5.9055, 0),
        (10.2235, -2.95275, -6.35),
        (10.2235, -5.9055, 4.318),
        (-8.658662068, 5.435763372, -6.35),
        (-6.510685688, 6.510685688, -6.35),
        (9.2075, -2.95275, -6.35),
    ]]
    fillet(fillet1_edges, radius=FILLET1_R)


solid = Compound([part.part, body_2_1.part])
